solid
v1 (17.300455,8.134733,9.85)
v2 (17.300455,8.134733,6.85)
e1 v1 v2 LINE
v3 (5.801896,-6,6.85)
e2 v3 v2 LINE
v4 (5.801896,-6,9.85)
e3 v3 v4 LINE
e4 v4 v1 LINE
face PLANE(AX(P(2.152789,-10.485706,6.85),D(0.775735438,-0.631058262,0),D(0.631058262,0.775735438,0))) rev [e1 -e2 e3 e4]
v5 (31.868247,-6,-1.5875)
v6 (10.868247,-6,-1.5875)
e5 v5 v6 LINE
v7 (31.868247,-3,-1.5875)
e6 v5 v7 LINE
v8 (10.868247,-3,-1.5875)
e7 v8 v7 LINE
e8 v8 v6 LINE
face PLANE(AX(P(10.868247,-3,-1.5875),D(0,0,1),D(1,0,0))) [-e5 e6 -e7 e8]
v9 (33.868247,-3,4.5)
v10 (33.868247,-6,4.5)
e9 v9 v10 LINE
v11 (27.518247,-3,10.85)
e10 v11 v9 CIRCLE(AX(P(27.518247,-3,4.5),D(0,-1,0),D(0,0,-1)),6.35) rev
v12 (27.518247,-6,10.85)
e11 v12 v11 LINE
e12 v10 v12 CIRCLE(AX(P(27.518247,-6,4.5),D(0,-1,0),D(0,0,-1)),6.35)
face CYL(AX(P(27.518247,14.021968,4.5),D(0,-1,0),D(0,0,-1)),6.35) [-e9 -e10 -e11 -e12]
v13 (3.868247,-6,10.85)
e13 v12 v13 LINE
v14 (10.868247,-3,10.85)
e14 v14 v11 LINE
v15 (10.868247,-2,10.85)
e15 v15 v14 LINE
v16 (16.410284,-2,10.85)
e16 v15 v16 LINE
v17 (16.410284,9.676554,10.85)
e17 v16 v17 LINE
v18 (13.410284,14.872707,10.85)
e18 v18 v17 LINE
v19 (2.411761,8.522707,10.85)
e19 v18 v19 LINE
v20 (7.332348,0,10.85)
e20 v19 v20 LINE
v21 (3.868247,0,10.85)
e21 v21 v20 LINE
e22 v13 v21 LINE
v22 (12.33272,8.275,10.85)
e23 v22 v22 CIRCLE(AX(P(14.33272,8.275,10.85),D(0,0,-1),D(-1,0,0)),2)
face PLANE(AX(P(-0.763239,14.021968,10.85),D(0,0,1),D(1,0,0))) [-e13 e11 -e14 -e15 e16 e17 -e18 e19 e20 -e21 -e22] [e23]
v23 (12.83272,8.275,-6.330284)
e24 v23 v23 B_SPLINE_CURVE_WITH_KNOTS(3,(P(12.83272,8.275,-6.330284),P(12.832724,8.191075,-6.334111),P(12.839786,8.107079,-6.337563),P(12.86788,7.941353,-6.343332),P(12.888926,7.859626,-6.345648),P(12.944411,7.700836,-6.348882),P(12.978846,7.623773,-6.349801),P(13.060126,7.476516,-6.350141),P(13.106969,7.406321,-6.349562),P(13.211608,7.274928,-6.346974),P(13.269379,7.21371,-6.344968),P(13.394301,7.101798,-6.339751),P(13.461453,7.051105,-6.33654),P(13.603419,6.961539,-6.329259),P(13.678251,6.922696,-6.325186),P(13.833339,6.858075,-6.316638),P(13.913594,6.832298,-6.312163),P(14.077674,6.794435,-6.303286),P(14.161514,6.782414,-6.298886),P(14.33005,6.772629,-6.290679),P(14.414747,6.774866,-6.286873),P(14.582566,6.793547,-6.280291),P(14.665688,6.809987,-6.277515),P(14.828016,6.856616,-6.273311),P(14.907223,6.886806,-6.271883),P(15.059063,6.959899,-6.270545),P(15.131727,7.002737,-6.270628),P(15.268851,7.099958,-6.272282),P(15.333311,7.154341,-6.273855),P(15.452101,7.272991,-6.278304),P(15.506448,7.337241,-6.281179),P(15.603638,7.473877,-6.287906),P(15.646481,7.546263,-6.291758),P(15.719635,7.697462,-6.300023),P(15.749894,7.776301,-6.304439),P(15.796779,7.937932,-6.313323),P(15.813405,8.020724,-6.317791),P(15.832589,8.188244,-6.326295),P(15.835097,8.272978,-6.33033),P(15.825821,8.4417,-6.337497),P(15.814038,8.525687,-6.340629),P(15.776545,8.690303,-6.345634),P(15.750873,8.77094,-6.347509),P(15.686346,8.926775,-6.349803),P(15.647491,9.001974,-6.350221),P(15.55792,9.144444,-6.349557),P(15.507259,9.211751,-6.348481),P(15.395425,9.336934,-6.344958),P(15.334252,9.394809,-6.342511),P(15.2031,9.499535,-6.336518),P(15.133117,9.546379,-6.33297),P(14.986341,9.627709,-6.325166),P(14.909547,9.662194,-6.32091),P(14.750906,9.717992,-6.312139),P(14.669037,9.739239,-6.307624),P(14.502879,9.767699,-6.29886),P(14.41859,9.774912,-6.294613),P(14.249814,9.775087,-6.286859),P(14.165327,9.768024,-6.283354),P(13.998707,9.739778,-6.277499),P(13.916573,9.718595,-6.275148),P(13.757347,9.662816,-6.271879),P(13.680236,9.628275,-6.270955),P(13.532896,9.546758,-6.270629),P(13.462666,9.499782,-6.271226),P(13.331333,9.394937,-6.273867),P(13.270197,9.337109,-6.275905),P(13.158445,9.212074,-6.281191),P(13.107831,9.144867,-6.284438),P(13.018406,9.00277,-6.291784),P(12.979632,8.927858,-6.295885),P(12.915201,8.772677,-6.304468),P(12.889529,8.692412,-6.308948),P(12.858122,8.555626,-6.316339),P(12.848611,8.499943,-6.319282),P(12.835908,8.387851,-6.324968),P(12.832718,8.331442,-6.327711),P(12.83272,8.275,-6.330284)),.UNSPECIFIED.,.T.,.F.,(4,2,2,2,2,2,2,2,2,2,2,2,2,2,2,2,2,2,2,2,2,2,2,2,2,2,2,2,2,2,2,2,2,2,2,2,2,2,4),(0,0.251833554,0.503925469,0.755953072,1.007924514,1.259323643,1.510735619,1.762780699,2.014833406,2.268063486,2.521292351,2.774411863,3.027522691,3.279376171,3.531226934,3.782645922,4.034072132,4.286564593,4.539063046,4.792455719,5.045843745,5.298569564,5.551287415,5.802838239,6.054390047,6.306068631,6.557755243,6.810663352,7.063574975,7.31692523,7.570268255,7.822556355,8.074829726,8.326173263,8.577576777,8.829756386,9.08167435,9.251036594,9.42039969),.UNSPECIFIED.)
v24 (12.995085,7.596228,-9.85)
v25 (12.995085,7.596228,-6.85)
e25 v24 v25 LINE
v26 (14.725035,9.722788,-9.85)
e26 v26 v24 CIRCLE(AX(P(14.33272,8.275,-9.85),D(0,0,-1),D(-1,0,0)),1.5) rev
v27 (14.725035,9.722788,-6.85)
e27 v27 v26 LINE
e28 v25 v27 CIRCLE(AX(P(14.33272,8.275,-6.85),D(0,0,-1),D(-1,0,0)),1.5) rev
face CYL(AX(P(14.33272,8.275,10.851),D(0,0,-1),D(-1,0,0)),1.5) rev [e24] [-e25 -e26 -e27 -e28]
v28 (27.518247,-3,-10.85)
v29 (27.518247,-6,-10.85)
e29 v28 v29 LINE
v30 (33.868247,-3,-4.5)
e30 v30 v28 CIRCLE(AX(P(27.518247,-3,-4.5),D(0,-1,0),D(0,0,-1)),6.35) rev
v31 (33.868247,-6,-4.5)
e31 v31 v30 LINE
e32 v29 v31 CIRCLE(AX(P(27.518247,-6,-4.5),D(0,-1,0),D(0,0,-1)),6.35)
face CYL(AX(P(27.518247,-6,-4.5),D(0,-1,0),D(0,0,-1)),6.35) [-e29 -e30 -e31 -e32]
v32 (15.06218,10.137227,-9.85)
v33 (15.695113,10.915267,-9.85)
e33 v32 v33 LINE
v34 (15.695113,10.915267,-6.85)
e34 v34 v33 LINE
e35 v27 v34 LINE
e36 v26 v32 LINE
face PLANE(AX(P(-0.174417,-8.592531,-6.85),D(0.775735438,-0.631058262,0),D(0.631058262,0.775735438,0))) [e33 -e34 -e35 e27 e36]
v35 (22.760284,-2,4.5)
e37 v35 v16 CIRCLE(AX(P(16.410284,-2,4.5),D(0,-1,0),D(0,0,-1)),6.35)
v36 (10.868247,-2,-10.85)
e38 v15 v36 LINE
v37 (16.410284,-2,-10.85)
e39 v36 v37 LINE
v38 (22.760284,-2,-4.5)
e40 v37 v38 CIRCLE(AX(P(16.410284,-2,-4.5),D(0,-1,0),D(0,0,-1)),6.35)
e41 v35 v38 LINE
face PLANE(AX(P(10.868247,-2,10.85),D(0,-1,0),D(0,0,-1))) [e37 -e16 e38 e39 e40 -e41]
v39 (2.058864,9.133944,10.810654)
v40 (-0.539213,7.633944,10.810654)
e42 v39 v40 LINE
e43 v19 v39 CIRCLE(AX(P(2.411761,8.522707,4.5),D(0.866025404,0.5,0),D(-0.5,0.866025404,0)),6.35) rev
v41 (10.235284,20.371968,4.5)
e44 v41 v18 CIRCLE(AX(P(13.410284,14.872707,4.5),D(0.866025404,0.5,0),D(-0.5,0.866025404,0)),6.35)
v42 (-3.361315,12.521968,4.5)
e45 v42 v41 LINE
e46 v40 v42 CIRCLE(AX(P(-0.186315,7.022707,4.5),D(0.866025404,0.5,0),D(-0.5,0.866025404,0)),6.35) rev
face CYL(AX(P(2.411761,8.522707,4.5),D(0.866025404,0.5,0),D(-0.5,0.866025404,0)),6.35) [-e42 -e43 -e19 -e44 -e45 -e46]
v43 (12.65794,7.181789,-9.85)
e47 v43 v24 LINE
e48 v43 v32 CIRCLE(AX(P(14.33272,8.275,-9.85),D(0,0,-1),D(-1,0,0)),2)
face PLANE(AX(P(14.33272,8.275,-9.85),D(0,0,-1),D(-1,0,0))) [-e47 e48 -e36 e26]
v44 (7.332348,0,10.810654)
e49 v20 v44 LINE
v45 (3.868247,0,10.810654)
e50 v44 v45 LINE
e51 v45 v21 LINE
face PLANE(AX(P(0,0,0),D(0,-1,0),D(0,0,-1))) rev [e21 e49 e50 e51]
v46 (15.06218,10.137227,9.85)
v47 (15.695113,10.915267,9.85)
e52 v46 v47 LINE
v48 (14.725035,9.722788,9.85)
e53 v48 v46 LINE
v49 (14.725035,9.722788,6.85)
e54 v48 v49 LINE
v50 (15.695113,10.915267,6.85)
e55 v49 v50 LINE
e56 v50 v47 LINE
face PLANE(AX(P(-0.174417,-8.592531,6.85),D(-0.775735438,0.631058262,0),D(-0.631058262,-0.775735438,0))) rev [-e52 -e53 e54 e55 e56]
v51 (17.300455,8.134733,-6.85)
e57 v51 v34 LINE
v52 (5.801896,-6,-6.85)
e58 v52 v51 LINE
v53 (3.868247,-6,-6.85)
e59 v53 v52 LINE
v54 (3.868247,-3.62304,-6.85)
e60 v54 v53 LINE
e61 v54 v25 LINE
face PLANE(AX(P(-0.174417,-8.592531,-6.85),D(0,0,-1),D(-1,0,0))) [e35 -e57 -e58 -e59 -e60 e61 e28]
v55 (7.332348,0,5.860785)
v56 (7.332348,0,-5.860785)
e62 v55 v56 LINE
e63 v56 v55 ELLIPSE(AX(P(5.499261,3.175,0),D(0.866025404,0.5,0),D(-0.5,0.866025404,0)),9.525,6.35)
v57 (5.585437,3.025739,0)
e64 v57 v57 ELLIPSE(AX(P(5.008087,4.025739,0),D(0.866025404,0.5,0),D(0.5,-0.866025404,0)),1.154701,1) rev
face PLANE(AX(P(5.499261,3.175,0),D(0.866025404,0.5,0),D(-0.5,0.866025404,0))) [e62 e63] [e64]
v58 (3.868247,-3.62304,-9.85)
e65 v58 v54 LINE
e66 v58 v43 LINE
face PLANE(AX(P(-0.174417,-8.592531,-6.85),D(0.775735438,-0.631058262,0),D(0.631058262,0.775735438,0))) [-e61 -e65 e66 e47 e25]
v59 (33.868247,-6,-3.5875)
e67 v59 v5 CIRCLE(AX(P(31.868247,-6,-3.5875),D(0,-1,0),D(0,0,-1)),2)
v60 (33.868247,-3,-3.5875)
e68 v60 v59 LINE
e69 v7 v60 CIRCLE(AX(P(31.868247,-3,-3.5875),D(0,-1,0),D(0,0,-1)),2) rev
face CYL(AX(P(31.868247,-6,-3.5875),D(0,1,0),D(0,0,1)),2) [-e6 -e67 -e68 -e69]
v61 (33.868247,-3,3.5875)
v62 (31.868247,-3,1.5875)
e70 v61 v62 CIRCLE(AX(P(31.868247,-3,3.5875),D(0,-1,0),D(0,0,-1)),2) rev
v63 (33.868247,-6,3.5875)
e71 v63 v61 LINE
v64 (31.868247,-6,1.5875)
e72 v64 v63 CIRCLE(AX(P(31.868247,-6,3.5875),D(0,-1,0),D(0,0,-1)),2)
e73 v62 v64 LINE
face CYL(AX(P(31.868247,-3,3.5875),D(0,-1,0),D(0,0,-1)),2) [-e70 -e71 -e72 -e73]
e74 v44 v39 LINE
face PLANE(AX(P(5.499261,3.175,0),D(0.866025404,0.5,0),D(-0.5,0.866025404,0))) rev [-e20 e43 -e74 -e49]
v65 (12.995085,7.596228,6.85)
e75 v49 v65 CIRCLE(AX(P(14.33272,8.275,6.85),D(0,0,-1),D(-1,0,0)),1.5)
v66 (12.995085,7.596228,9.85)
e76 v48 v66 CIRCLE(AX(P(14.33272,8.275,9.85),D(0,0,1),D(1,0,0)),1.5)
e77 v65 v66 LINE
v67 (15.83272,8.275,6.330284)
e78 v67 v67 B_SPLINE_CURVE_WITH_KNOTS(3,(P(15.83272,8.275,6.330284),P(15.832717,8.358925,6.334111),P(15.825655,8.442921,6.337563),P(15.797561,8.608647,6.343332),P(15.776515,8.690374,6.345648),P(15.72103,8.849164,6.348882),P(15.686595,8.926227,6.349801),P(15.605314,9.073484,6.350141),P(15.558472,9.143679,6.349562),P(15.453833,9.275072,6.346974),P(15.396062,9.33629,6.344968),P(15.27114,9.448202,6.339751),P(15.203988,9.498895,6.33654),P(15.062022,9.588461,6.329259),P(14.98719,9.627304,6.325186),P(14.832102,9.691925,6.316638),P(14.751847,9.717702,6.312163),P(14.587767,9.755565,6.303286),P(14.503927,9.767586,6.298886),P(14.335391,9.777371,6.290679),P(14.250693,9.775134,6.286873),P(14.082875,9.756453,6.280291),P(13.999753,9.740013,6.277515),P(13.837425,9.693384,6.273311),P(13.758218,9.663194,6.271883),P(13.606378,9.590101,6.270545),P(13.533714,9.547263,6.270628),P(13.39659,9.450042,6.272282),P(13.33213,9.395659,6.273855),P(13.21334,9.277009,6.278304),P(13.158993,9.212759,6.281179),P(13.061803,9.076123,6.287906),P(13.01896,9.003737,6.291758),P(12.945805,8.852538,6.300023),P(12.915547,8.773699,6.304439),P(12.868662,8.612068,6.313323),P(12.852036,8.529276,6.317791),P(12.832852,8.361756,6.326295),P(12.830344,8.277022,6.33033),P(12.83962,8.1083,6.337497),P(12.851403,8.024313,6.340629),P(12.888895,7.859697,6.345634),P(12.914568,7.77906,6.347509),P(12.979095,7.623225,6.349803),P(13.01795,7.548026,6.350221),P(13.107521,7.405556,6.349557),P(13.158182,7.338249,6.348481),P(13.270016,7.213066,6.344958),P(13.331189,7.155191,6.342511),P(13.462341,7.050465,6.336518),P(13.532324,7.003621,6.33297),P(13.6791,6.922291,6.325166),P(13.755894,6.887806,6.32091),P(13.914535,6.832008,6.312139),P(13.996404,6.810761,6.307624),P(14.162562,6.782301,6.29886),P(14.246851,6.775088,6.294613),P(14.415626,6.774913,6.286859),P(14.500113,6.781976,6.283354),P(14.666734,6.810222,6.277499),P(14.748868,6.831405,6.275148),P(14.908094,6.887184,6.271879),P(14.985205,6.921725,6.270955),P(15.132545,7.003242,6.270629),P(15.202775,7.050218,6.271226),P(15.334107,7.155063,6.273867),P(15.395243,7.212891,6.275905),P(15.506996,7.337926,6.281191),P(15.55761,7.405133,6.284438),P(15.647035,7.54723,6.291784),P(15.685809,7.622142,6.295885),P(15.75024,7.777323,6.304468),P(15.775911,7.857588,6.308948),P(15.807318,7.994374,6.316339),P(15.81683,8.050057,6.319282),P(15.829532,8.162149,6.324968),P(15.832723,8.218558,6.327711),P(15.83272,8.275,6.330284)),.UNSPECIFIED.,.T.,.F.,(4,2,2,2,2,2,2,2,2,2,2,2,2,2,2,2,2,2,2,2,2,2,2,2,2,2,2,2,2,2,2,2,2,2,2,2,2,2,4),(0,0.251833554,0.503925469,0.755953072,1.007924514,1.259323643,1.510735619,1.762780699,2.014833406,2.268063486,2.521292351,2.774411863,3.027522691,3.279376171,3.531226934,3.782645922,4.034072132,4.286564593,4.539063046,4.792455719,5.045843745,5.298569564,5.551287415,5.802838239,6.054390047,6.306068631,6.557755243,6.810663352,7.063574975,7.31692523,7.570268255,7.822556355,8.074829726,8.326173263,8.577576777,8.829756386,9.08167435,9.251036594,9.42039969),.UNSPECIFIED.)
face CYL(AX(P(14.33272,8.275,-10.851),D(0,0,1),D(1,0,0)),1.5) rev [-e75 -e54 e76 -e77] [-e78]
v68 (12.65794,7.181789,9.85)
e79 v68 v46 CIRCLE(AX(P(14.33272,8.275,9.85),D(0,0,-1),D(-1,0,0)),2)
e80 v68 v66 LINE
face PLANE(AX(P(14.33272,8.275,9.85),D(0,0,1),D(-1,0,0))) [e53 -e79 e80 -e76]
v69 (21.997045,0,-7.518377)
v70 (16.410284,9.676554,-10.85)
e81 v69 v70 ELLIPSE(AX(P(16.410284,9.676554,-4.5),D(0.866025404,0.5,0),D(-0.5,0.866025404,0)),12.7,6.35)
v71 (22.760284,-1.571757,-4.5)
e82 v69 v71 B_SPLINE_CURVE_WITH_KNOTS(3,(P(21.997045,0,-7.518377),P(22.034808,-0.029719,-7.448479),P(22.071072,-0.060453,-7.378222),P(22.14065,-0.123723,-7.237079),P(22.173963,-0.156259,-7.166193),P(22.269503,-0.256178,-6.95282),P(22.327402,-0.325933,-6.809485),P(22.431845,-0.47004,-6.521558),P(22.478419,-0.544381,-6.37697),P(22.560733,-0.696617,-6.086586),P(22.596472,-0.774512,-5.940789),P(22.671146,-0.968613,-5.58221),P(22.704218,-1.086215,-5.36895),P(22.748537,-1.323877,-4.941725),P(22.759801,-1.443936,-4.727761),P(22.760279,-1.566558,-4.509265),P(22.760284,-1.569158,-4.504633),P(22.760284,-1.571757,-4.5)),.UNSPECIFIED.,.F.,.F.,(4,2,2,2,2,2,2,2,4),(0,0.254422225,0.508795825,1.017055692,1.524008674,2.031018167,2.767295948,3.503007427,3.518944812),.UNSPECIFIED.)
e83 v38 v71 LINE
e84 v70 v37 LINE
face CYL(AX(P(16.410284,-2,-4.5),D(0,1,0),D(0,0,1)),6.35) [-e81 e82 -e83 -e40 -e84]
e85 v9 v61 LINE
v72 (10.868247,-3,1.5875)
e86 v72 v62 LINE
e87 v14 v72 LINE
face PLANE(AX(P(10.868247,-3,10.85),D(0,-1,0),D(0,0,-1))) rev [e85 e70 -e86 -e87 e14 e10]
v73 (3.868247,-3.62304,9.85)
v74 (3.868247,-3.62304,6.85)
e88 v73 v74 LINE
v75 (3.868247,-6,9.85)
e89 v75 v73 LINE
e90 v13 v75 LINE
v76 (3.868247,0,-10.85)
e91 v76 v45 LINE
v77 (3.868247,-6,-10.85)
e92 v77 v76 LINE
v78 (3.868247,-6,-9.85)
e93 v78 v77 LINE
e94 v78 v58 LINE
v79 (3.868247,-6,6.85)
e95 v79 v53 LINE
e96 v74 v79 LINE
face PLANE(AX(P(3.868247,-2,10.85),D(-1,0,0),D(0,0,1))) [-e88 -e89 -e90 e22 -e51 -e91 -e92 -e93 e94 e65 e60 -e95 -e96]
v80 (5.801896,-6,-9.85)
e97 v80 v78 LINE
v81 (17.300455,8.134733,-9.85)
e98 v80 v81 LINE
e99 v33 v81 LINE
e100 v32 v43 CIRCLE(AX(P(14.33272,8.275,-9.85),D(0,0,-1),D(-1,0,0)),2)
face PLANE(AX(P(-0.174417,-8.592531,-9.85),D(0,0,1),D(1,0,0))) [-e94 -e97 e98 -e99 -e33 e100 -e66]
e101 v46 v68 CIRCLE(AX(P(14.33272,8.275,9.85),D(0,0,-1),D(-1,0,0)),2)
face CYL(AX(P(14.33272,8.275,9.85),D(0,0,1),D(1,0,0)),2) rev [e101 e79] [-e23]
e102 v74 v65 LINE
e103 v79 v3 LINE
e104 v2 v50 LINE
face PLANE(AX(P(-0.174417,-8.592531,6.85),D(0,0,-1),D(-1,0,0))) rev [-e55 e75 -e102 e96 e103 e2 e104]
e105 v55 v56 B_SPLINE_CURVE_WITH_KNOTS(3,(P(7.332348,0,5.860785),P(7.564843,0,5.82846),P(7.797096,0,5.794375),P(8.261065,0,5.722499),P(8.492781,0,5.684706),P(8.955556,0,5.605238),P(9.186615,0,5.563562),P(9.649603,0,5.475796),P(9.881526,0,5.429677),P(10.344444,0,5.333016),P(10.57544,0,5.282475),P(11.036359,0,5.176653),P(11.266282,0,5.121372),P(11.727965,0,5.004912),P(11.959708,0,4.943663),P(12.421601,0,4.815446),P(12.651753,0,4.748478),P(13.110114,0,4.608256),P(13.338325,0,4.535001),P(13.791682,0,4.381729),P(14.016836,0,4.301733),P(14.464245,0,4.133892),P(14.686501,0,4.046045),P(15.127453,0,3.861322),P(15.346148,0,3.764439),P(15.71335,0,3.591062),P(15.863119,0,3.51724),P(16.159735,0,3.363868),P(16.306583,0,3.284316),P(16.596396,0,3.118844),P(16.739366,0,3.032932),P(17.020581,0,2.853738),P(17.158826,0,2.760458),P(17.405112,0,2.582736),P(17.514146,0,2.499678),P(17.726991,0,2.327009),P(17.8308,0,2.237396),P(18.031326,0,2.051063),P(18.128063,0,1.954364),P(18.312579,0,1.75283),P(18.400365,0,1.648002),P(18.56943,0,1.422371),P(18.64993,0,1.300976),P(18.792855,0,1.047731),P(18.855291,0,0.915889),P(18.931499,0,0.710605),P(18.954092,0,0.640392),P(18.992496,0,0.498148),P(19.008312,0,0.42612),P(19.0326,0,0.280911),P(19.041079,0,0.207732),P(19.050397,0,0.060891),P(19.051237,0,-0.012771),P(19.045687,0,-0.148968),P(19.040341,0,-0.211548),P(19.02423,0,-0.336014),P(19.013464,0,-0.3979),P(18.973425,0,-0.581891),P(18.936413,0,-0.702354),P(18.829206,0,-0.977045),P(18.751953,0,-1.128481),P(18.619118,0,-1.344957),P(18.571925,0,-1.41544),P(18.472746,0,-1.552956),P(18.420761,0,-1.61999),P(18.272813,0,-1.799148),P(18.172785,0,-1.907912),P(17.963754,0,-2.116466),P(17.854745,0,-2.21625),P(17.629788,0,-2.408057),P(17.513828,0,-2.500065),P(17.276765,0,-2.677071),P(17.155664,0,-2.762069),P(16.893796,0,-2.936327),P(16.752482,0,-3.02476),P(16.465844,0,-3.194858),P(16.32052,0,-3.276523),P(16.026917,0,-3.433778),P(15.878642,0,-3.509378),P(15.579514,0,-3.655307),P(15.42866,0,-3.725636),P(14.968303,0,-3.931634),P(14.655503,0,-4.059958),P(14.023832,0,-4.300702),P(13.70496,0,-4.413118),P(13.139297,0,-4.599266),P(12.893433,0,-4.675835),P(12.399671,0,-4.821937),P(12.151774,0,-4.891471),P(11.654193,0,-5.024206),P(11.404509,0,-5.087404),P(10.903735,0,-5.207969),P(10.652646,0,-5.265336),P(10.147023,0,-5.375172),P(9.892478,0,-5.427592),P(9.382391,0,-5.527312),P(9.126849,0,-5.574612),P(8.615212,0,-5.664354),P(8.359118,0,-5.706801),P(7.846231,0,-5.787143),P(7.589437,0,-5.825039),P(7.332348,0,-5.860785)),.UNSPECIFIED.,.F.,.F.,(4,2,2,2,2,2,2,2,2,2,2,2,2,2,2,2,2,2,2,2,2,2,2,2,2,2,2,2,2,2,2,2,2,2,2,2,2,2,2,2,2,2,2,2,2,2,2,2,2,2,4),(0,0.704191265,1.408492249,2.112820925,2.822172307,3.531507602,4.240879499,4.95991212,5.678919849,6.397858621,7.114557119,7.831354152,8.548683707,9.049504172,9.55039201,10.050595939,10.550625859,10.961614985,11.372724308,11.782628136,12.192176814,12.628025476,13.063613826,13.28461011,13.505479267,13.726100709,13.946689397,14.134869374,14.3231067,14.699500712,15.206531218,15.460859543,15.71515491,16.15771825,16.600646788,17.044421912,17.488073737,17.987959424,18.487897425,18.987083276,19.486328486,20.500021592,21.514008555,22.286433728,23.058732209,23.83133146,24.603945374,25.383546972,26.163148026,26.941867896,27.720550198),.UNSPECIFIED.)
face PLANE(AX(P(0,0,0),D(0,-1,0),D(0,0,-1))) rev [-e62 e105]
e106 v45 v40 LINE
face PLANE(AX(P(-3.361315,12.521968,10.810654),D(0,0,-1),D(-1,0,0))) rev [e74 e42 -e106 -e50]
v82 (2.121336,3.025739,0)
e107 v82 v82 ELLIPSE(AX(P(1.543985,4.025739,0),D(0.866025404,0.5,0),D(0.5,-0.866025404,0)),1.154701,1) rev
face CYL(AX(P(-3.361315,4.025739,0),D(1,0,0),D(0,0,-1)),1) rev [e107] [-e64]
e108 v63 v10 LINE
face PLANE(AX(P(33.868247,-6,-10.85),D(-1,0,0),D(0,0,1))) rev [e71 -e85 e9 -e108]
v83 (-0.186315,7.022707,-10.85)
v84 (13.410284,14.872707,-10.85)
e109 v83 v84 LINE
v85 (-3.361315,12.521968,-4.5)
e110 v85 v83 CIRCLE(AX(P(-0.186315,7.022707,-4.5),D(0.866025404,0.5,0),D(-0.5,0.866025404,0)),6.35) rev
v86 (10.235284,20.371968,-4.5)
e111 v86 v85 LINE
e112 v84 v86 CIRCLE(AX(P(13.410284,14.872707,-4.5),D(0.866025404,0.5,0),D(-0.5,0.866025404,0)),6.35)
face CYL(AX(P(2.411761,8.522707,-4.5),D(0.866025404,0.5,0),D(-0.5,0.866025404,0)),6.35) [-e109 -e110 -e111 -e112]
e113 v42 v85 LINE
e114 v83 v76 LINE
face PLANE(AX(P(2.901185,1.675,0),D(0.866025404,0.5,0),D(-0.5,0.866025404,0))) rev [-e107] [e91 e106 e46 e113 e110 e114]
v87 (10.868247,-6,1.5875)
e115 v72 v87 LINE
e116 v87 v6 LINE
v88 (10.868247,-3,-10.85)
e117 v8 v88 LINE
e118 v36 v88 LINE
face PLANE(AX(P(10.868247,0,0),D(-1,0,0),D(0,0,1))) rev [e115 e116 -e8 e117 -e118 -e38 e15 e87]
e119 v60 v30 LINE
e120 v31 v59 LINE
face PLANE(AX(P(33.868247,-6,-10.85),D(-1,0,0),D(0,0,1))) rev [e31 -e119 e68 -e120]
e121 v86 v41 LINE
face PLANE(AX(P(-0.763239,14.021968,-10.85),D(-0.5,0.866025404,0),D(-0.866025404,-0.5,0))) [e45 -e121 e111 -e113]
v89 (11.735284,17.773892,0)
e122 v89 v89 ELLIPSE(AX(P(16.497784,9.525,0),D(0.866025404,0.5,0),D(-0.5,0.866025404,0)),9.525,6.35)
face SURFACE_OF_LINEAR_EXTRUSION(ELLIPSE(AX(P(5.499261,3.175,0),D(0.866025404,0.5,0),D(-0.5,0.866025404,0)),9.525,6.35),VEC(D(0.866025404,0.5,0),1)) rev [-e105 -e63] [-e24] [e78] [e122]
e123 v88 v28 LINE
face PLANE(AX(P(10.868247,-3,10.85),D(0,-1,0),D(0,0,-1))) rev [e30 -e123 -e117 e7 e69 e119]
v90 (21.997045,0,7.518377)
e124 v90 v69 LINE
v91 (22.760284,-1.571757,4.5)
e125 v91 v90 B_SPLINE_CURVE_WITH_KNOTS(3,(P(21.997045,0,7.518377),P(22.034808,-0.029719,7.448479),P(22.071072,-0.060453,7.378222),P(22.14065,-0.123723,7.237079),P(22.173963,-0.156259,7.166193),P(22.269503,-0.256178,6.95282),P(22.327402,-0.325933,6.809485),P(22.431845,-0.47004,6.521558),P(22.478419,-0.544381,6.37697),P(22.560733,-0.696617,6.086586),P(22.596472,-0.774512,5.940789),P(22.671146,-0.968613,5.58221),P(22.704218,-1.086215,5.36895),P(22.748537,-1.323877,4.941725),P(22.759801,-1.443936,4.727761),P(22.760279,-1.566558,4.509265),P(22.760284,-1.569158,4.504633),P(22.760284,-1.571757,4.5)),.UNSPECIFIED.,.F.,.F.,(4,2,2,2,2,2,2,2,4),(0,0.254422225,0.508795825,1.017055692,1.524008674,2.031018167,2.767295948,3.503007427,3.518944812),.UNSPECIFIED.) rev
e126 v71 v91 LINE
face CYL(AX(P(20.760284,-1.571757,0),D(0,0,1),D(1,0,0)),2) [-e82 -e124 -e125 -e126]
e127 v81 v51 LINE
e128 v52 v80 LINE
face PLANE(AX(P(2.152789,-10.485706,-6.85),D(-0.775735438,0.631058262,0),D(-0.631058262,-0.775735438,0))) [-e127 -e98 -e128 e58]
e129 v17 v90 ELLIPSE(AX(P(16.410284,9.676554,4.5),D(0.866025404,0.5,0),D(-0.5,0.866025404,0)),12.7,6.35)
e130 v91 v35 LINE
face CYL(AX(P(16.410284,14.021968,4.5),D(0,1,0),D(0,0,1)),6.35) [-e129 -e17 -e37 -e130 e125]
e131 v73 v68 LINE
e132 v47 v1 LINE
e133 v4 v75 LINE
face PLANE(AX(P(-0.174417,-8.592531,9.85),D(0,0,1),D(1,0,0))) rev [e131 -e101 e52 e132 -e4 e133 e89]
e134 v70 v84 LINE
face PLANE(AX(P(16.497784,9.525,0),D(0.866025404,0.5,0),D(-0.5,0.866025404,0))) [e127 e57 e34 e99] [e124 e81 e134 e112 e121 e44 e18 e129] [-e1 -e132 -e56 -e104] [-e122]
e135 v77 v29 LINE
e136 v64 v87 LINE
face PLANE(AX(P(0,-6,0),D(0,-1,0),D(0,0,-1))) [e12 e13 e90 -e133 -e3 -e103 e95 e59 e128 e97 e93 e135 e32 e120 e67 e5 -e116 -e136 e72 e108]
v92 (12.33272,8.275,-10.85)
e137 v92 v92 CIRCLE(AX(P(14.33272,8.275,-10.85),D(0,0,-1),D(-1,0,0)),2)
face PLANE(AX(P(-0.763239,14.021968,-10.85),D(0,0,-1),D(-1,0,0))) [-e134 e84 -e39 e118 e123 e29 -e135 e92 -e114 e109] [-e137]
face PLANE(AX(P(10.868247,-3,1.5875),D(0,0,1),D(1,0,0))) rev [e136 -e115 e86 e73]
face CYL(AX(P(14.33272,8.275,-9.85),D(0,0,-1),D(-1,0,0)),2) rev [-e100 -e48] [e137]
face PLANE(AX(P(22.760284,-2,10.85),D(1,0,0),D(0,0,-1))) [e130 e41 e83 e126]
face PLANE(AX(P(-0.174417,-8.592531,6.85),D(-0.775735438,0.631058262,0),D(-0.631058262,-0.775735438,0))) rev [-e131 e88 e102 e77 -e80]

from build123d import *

# Parameters (mm, degrees)
SKETCH2_W           = 21.7
SKETCH2_H           = 25.05
SKETCH2_RX          = 9.525
SKETCH2_RY          = 6.35
BOSS_EXTRUDE1_DEPTH = 12.7
SKETCH3_W           = 21.660653916
SKETCH3_H           = 25.05
BOSS_EXTRUDE2_DEPTH = 3
SKETCH5_W           = 18.892037138
SKETCH5_H           = 21.7
BOSS_EXTRUDE3_DEPTH = 2
SKETCH6_W           = 30
SKETCH6_H           = 21.7
BOSS_EXTRUDE4_DEPTH = 4
SKETCH7_W           = 21.7
SKETCH7_H           = 1
SKETCH7_W_2         = 3.175
SKETCH7_H_2         = 3
CUT_EXTRUDE2_DEPTH  = 23
SKETCH7_3_W         = 21.7
SKETCH7_3_H         = 7.272473706
CUT_EXTRUDE3_DEPTH  = 44.803879418
SKETCH11_R          = 1
CUT_EXTRUDE8_DEPTH  = 33.487034031
SKETCH15_W          = 3
SKETCH15_H          = 3
CUT_EXTRUDE9_DEPTH  = 28.443249292
CUT_EXTRUDE4_REACH  = 47.088
SKETCH9_R           = 1.5
SKETCH10_R          = 2
CUT_EXTRUDE7_DEPTH  = 1
FILLET5_R           = 6.35
FILLET6_R           = 2
FILLET7_R           = 2


with BuildPart() as part:
    # Sketch2 → Boss-Extrude1 (new body)
    with BuildSketch(Plane(origin=(16.497783942, 9.525, 0), x_dir=(0, 0, -1), z_dir=(0.8660254037844379, 0.5000000000000013, 0))):
        Rectangle(SKETCH2_W, SKETCH2_H)
        with Locations(Location((0, 0), (0, 0, 90))):
            Ellipse(SKETCH2_RX, SKETCH2_RY, mode=Mode.SUBTRACT)
    extrude(amount=-BOSS_EXTRUDE1_DEPTH)

    # Sketch3 → Boss-Extrude2 (add)
    with BuildSketch(Plane(origin=(5.499261314, 3.175, 0), x_dir=(0, 0, 1), z_dir=(-0.8660254037844379, -0.5000000000000014, 0))):
        with Locations((-0.019673042, 0)):
            Rectangle(SKETCH3_W, SKETCH3_H)
    extrude(amount=BOSS_EXTRUDE2_DEPTH)

    # Sketch5 → Boss-Extrude3 (add)
    with BuildSketch(Plane(origin=(0, 0, 0), x_dir=(-1, 0, 0), z_dir=(0, 1, 0))):
        with Locations((-13.314265373, 0)):
            Rectangle(SKETCH5_W, SKETCH5_H)
    extrude(amount=-BOSS_EXTRUDE3_DEPTH)

    # Sketch6 → Boss-Extrude4 (add)
    with BuildSketch(Plane.XZ.offset(2)):
        with Locations((18.868246804, 0)):
            Rectangle(SKETCH6_W, SKETCH6_H)
    extrude(amount=BOSS_EXTRUDE4_DEPTH)

    # Sketch7 → Cut-Extrude2 (cut)
    with BuildSketch(Plane(origin=(33.868246804, 0, 0), x_dir=(0, 0, -1), z_dir=(1, 0, 0))):
        with Locations((0, -2.5)):
            Rectangle(SKETCH7_W, SKETCH7_H)
        with Locations((0, -4.5)):
            Rectangle(SKETCH7_W_2, SKETCH7_H_2)
    extrude(amount=-CUT_EXTRUDE2_DEPTH, mode=Mode.SUBTRACT)

    # Sketch7<3> → Cut-Extrude3 (cut, through all)
    with BuildSketch(Plane(origin=(33.868246804, 0, 0), x_dir=(0, 0, -1), z_dir=(1, 0, 0))):
        with Locations((0, -9.636236853)):
            Rectangle(SKETCH7_3_W, SKETCH7_3_H)
    extrude(amount=-CUT_EXTRUDE3_DEPTH, mode=Mode.SUBTRACT)

    # Sketch11 → Cut-Extrude8 (cut, through all)
    with BuildSketch(Plane(origin=(19.672783942, 0.194872981, 0), x_dir=(0, 0, -1), z_dir=(-1, 0, 0))):
        with Locations(Location((0, -3.830865705, 0), (0, 0, 90))):
            Circle(SKETCH11_R)
    extrude(amount=CUT_EXTRUDE8_DEPTH, mode=Mode.SUBTRACT)

    # Sketch15 → Cut-Extrude9 (cut, symmetric)
    with BuildSketch(Plane(origin=(16.497783942, 9.525, 0), x_dir=(0.7757354378747654, -0.6310582623064579, 0), z_dir=(0.6310582623064579, 0.7757354378747654, 0))):
        with Locations((0, -8.35)):
            Rectangle(SKETCH15_W, SKETCH15_H)
    cut_extrude9 = extrude(amount=CUT_EXTRUDE9_DEPTH, both=True, mode=Mode.SUBTRACT)

    # Sketch9 → Cut-Extrude4 (cut, up to next)
    with BuildSketch(Plane(origin=(0, 0, -10.85), x_dir=(-1, 0, 0), z_dir=(0, 0, -1)), mode=Mode.PRIVATE) as cut_extrude4_sk1:
        with Locations((-14.332720433, 8.275)):
            Circle(SKETCH9_R)
    cut_extrude4_tool1 = extrude(cut_extrude4_sk1.sketch, amount=-CUT_EXTRUDE4_REACH, mode=Mode.PRIVATE) & part.part
    cut_extrude4 = cut_extrude4_tool1.solids().sort_by_distance((14.33272, 8.275, -10.85))[0]
    add(cut_extrude4, mode=Mode.SUBTRACT)

    # Sketch10 → Cut-Extrude7 (cut)
    with BuildSketch(Plane(origin=(0, 0, -10.85), x_dir=(-1, 0, 0), z_dir=(0, 0, -1))):
        with Locations((-14.332720433, 8.275)):
            Circle(SKETCH10_R)
    cut_extrude7 = extrude(amount=-CUT_EXTRUDE7_DEPTH, mode=Mode.SUBTRACT)

    # Mirror1: Cut-Extrude9, Cut-Extrude4, Cut-Extrude7 across plane
    add(cut_extrude9.mirror(Plane.XY), mode=Mode.SUBTRACT)
    add(cut_extrude4.mirror(Plane.XY), mode=Mode.SUBTRACT)
    add(cut_extrude7.mirror(Plane.XY), mode=Mode.SUBTRACT)

    # Fillet5
    fillet5_edges = [part.edges().sort_by_distance(p)[0] for p in [
        (33.868246804, -4.5, 10.85),
        (33.868246804, -4.5, -10.85),
        (22.760283942, -1, -10.85),
        (22.760283942, -1, 10.85),
        (4.736022628, 17.196968182, 10.85),
        (3.436984522, 16.446968182, -10.85),
    ]]
    fillet(fillet5_edges, radius=FILLET5_R)

    # Fillet6
    fillet6_edges = [part.edges().sort_by_distance(p)[0] for p in [
        (33.868246804, -4.5, 1.5875),
        (33.868246804, -4.5, -1.5875),
    ]]
    fillet(fillet6_edges, radius=FILLET6_R)

    # Fillet7
    # the kernel refuses this fillet: 2 mm, written as the material it takes off along each edge
    with BuildSketch(Plane(origin=(22.760283942, 0, 8.429393602), x_dir=(-1, 0, 0), z_dir=(0, 0, -1))) as fillet7_piece_1:
        with BuildLine():
            CenterArc((2, -1.571757441), FILLET7_R, 128.197977663, 51.802022337)
            Line((0, -1.571757441), (-0.04, -1.571757441))
            Line((-0.04, -1.571757441), (-0.04, 0))
            Line((-0.04, 0), (0, 0.04))
            ThreePointArc((0, 0.04), (0.381619343, 0.04), (0.73850346, 0.031435149))
            Line((0.73850346, 0.031435149), (0.763238686, 0))
        make_face()
    extrude(amount=16.858787203, mode=Mode.SUBTRACT)


solid = part.part
